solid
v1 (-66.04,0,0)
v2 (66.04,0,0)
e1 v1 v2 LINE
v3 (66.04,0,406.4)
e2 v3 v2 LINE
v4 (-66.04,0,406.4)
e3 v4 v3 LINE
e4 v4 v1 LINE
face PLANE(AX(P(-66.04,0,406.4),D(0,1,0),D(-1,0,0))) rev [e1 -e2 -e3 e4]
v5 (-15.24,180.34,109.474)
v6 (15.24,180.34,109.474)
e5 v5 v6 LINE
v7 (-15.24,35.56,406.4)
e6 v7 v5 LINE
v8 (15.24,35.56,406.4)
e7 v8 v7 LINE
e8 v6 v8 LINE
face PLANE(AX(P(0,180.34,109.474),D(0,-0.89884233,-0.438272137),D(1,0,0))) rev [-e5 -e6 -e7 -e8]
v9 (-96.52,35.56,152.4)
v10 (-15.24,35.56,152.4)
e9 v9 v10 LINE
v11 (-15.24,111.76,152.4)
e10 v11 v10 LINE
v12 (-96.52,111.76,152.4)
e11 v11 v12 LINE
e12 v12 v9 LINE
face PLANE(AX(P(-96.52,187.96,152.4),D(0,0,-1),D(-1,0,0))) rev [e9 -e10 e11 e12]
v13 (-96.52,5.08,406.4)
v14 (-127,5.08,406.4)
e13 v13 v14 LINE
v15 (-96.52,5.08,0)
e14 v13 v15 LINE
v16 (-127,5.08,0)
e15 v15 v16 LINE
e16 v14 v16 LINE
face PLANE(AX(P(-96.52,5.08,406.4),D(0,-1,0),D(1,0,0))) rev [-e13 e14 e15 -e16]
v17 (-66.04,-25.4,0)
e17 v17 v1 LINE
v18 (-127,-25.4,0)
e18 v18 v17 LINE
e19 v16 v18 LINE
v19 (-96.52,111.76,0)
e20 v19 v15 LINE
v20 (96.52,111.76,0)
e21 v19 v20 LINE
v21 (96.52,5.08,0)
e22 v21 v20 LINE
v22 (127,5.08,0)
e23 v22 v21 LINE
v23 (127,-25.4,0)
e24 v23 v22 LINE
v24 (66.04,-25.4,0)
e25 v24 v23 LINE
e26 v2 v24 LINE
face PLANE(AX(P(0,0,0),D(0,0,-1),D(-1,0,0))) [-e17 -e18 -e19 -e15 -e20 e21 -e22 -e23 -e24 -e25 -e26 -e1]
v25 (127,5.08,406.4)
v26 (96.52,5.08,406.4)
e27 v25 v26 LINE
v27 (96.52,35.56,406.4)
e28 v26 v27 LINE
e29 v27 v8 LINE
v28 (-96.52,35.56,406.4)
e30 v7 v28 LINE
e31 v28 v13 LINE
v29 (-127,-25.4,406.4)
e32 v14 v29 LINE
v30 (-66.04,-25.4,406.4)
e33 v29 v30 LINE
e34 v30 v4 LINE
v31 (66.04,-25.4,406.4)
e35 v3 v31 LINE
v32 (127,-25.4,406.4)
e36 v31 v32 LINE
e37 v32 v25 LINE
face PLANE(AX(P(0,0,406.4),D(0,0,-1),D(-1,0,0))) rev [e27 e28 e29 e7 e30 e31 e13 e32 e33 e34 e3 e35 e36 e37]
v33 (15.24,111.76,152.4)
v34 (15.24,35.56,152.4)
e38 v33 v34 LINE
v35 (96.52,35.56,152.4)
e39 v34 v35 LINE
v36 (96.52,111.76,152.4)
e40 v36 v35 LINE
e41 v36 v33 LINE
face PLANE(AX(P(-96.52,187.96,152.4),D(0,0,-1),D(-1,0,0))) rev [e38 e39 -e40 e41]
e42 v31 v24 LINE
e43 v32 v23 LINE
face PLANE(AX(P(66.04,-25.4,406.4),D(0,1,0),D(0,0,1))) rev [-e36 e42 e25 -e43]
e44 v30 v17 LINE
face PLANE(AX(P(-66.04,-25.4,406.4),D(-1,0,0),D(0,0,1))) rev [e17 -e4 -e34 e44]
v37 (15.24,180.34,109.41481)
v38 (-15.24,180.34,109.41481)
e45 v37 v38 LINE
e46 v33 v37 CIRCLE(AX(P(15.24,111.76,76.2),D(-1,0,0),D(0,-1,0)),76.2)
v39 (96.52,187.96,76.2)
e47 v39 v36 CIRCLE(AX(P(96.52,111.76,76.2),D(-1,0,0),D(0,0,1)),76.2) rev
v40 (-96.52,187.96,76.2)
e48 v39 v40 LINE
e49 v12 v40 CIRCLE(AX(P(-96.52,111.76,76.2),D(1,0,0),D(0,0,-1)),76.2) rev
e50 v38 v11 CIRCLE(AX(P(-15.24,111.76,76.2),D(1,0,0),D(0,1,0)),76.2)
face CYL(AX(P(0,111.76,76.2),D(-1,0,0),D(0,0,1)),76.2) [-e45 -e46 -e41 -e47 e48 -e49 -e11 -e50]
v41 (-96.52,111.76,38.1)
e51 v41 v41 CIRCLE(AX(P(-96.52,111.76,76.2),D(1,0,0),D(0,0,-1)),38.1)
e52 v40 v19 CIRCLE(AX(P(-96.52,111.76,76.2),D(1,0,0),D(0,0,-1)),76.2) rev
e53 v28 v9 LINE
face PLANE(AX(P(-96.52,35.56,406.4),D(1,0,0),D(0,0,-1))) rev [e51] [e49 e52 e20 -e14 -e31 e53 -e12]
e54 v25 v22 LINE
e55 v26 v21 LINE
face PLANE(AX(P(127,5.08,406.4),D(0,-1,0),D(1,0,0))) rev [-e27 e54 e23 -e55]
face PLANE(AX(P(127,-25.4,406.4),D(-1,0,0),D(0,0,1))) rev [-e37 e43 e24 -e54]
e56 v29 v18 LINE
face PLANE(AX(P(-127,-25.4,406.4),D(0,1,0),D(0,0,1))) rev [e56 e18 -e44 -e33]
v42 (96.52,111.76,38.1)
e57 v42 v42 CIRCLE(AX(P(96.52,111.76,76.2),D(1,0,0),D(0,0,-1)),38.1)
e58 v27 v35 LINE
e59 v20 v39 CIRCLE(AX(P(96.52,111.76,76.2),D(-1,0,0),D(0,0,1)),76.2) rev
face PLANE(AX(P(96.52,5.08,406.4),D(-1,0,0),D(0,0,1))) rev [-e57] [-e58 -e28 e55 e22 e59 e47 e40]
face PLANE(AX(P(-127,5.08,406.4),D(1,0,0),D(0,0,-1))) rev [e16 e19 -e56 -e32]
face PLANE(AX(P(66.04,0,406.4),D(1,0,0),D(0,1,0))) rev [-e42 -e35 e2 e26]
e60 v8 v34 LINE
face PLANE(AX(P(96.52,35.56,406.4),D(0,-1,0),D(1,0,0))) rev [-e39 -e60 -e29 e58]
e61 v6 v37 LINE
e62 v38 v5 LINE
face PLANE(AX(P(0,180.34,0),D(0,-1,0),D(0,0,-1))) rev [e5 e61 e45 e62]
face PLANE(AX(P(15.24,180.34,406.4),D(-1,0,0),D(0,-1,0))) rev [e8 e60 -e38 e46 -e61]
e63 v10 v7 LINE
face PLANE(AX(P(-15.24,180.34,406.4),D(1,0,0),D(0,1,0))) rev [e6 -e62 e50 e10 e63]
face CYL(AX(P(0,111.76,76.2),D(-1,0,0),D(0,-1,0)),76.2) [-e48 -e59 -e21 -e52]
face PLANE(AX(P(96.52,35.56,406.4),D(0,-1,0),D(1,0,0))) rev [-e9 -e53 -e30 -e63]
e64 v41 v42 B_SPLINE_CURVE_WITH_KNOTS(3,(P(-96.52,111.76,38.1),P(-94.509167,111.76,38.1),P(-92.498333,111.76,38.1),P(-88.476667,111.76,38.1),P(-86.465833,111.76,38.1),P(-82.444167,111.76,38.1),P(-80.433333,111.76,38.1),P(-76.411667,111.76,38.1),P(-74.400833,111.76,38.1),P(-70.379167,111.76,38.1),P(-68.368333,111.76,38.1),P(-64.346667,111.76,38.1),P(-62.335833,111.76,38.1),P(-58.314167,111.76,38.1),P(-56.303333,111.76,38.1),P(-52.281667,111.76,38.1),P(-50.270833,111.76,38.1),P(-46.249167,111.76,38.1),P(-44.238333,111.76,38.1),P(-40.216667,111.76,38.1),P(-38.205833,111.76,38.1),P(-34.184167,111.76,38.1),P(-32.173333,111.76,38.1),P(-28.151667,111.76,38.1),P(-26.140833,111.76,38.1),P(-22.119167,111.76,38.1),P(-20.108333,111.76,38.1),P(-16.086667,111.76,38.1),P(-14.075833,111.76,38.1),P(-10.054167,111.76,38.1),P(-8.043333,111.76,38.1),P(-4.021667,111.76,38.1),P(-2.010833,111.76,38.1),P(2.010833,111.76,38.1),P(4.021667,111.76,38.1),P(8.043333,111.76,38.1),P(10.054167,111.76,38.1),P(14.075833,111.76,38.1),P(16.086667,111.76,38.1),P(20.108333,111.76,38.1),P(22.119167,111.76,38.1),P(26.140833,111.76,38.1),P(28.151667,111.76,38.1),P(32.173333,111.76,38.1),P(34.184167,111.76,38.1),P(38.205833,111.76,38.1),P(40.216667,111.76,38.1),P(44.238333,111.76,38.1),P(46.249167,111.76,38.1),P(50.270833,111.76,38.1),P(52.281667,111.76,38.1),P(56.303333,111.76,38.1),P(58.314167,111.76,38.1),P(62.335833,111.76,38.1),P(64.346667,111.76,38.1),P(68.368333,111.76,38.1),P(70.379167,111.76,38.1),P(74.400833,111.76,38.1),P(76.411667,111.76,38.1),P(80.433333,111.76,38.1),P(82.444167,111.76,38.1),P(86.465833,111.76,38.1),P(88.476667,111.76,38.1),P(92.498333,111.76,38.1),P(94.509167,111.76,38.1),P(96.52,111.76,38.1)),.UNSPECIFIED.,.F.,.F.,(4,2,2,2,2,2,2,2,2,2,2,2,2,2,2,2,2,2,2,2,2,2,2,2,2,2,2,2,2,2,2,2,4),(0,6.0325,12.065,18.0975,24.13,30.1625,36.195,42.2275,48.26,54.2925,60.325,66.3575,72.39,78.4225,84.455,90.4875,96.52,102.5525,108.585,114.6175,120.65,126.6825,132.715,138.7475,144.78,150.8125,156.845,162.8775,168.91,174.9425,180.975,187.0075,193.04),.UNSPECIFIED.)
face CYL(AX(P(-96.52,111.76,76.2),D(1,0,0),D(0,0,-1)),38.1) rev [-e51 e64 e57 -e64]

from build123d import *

# Parameters (mm, degrees)
BOSS_EXTRUDE1_DEPTH = 406.4
SKETCH3_W           = 193.04
SKETCH3_H           = 152.4
BOSS_EXTRUDE2_DEPTH = 152.4
SKETCH4_W           = 30.48
SKETCH4_H           = 254
BOSS_EXTRUDE3_DEPTH = 144.78
SKETCH5_R           = 38.1
CUT_EXTRUDE1_DEPTH  = 193.04
FILLET1_R           = 76.2
CHAMFER2_SIZE       = 144.78
CHAMFER2_SIZE2      = 296.926


with BuildPart() as part:
    # Sketch2 → Boss-Extrude1 (new body)
    with BuildSketch(Plane.XY):
        Polygon((-96.52, 5.08), (-127, 5.08), (-127, -25.4), (-66.04, -25.4), (-66.04, 0), (66.04, 0), (66.04, -25.4), (127, -25.4), (127, 5.08), (96.52, 5.08), (96.52, 35.56), (-96.52, 35.56), align=None)
    extrude(amount=BOSS_EXTRUDE1_DEPTH)

    # Sketch3 → Boss-Extrude2 (add)
    with BuildSketch(Plane(origin=(0, 35.56, 0), x_dir=(1, 0, 0), z_dir=(0, 1, 0))):
        with Locations((0, -76.2)):
            Rectangle(SKETCH3_W, SKETCH3_H)
    extrude(amount=BOSS_EXTRUDE2_DEPTH)

    # Sketch4 → Boss-Extrude3 (add)
    with BuildSketch(Plane(origin=(0, 35.56, 0), x_dir=(1, 0, 0), z_dir=(0, 1, 0))):
        with Locations((0, -279.4)):
            Rectangle(SKETCH4_W, SKETCH4_H)
    extrude(amount=BOSS_EXTRUDE3_DEPTH)

    # Sketch5 → Cut-Extrude1 (cut)
    with BuildSketch(Plane(origin=(96.52, 0, 0), x_dir=(0, 0, -1), z_dir=(1, 0, 0))):
        with Locations((-76.2, 111.76)):
            Circle(SKETCH5_R)
    extrude(amount=-CUT_EXTRUDE1_DEPTH, mode=Mode.SUBTRACT)

    # Fillet1
    # the kernel refuses this fillet: 76.2 mm, written as the material it takes off along each edge
    with BuildSketch(Plane(origin=(287.02, 187.96, 152.4), x_dir=(0, -1, 0), z_dir=(-1, 0, 0))) as fillet1_piece_1_section:
        with BuildLine():
            CenterArc((FILLET1_R, -FILLET1_R), FILLET1_R, 90, 90)
            Line((0, -FILLET1_R), (0, 0))
            Line((0, 0), (FILLET1_R, 0))
        make_face()
    fillet1_piece_1 = extrude(amount=574.04, mode=Mode.PRIVATE)
    fillet1_piece_1 = split(fillet1_piece_1, bisect_by=Plane(origin=(15.24, 162.276069746, 141.915616322), z_dir=(1, 0, 0)), keep=Keep.TOP, mode=Mode.PRIVATE)
    fillet1_piece_1 = split(fillet1_piece_1, bisect_by=Plane(origin=(151.13, 180.34, 141.915616322), z_dir=(0, -1, 0)), keep=Keep.TOP, mode=Mode.PRIVATE)
    add(fillet1_piece_1, mode=Mode.SUBTRACT)
    with BuildSketch(Plane(origin=(287.02, 187.96, 152.4), x_dir=(0, -1, 0), z_dir=(-1, 0, 0))) as fillet1_piece_2_section:
        with BuildLine():
            CenterArc((FILLET1_R, -FILLET1_R), FILLET1_R, 90, 90)
            Line((0, -FILLET1_R), (0, 0))
            Line((0, 0), (FILLET1_R, 0))
        make_face()
    fillet1_piece_2 = extrude(amount=574.04, mode=Mode.PRIVATE)
    fillet1_piece_2 = split(fillet1_piece_2, bisect_by=Plane(origin=(15.24, 185.388736326, 123.368401859), z_dir=(1, 0, 0)), keep=Keep.TOP, mode=Mode.PRIVATE)
    fillet1_piece_2 = split(fillet1_piece_2, bisect_by=Plane(origin=(151.13, 180.34, 123.368401859), z_dir=(0, 1, 0)), keep=Keep.TOP, mode=Mode.PRIVATE)
    add(fillet1_piece_2, mode=Mode.SUBTRACT)
    with BuildSketch(Plane(origin=(287.02, 187.96, 152.4), x_dir=(0, -1, 0), z_dir=(-1, 0, 0))) as fillet1_piece_3_section:
        with BuildLine():
            CenterArc((FILLET1_R, -FILLET1_R), FILLET1_R, 90, 90)
            Line((0, -FILLET1_R), (0, 0))
            Line((0, 0), (FILLET1_R, 0))
        make_face()
    fillet1_piece_3 = extrude(amount=574.04, mode=Mode.PRIVATE)
    fillet1_piece_3 = split(fillet1_piece_3, bisect_by=Plane(origin=(15.24, 185.388736326, 123.368401859), z_dir=(-1, 0, 0)), keep=Keep.TOP, mode=Mode.PRIVATE)
    fillet1_piece_3 = split(fillet1_piece_3, bisect_by=Plane(origin=(0, 180.34, 123.368401859), z_dir=(0, 1, 0)), keep=Keep.TOP, mode=Mode.PRIVATE)
    fillet1_piece_3 = split(fillet1_piece_3, bisect_by=Plane(origin=(-15.24, 185.388736326, 123.368401859), z_dir=(1, 0, 0)), keep=Keep.TOP, mode=Mode.PRIVATE)
    add(fillet1_piece_3, mode=Mode.SUBTRACT)
    with BuildSketch(Plane(origin=(287.02, 187.96, 152.4), x_dir=(0, -1, 0), z_dir=(-1, 0, 0))) as fillet1_piece_4_section:
        with BuildLine():
            CenterArc((FILLET1_R, -FILLET1_R), FILLET1_R, 90, 90)
            Line((0, -FILLET1_R), (0, 0))
            Line((0, 0), (FILLET1_R, 0))
        make_face()
    fillet1_piece_4 = extrude(amount=574.04, mode=Mode.PRIVATE)
    fillet1_piece_4 = split(fillet1_piece_4, bisect_by=Plane(origin=(-151.13, 180.34, 141.915616322), z_dir=(0, -1, 0)), keep=Keep.TOP, mode=Mode.PRIVATE)
    fillet1_piece_4 = split(fillet1_piece_4, bisect_by=Plane(origin=(-15.24, 162.276069746, 141.915616322), z_dir=(-1, 0, 0)), keep=Keep.TOP, mode=Mode.PRIVATE)
    add(fillet1_piece_4, mode=Mode.SUBTRACT)
    with BuildSketch(Plane(origin=(287.02, 187.96, 152.4), x_dir=(0, -1, 0), z_dir=(-1, 0, 0))) as fillet1_piece_5_section:
        with BuildLine():
            CenterArc((FILLET1_R, -FILLET1_R), FILLET1_R, 90, 90)
            Line((0, -FILLET1_R), (0, 0))
            Line((0, 0), (FILLET1_R, 0))
        make_face()
    fillet1_piece_5 = extrude(amount=574.04, mode=Mode.PRIVATE)
    fillet1_piece_5 = split(fillet1_piece_5, bisect_by=Plane(origin=(-151.13, 180.34, 123.368401859), z_dir=(0, 1, 0)), keep=Keep.TOP, mode=Mode.PRIVATE)
    fillet1_piece_5 = split(fillet1_piece_5, bisect_by=Plane(origin=(-15.24, 185.388736326, 123.368401859), z_dir=(-1, 0, 0)), keep=Keep.TOP, mode=Mode.PRIVATE)
    add(fillet1_piece_5, mode=Mode.SUBTRACT)
    with BuildSketch(Plane(origin=(-287.02, 187.96, 0), x_dir=(0, -1, 0), z_dir=(1, 0, 0))) as fillet1_piece_6:
        with BuildLine():
            CenterArc((FILLET1_R, -FILLET1_R), FILLET1_R, 90, 90)
            Line((0, -FILLET1_R), (0, 0))
            Line((0, 0), (FILLET1_R, 0))
        make_face()
    extrude(amount=574.04, mode=Mode.SUBTRACT)

    # Chamfer2
    chamfer2_edges = [part.edges().sort_by_distance(p)[0] for p in [
        (0, 180.34, 406.4),
    ]]
    chamfer2_side = [part.faces().sort_by_distance(p)[0] for p in [
        (0, 38.129015817, 406.4),
    ]]
    chamfer(chamfer2_edges, length=CHAMFER2_SIZE, length2=CHAMFER2_SIZE2, reference=chamfer2_side[0])


solid = part.part
